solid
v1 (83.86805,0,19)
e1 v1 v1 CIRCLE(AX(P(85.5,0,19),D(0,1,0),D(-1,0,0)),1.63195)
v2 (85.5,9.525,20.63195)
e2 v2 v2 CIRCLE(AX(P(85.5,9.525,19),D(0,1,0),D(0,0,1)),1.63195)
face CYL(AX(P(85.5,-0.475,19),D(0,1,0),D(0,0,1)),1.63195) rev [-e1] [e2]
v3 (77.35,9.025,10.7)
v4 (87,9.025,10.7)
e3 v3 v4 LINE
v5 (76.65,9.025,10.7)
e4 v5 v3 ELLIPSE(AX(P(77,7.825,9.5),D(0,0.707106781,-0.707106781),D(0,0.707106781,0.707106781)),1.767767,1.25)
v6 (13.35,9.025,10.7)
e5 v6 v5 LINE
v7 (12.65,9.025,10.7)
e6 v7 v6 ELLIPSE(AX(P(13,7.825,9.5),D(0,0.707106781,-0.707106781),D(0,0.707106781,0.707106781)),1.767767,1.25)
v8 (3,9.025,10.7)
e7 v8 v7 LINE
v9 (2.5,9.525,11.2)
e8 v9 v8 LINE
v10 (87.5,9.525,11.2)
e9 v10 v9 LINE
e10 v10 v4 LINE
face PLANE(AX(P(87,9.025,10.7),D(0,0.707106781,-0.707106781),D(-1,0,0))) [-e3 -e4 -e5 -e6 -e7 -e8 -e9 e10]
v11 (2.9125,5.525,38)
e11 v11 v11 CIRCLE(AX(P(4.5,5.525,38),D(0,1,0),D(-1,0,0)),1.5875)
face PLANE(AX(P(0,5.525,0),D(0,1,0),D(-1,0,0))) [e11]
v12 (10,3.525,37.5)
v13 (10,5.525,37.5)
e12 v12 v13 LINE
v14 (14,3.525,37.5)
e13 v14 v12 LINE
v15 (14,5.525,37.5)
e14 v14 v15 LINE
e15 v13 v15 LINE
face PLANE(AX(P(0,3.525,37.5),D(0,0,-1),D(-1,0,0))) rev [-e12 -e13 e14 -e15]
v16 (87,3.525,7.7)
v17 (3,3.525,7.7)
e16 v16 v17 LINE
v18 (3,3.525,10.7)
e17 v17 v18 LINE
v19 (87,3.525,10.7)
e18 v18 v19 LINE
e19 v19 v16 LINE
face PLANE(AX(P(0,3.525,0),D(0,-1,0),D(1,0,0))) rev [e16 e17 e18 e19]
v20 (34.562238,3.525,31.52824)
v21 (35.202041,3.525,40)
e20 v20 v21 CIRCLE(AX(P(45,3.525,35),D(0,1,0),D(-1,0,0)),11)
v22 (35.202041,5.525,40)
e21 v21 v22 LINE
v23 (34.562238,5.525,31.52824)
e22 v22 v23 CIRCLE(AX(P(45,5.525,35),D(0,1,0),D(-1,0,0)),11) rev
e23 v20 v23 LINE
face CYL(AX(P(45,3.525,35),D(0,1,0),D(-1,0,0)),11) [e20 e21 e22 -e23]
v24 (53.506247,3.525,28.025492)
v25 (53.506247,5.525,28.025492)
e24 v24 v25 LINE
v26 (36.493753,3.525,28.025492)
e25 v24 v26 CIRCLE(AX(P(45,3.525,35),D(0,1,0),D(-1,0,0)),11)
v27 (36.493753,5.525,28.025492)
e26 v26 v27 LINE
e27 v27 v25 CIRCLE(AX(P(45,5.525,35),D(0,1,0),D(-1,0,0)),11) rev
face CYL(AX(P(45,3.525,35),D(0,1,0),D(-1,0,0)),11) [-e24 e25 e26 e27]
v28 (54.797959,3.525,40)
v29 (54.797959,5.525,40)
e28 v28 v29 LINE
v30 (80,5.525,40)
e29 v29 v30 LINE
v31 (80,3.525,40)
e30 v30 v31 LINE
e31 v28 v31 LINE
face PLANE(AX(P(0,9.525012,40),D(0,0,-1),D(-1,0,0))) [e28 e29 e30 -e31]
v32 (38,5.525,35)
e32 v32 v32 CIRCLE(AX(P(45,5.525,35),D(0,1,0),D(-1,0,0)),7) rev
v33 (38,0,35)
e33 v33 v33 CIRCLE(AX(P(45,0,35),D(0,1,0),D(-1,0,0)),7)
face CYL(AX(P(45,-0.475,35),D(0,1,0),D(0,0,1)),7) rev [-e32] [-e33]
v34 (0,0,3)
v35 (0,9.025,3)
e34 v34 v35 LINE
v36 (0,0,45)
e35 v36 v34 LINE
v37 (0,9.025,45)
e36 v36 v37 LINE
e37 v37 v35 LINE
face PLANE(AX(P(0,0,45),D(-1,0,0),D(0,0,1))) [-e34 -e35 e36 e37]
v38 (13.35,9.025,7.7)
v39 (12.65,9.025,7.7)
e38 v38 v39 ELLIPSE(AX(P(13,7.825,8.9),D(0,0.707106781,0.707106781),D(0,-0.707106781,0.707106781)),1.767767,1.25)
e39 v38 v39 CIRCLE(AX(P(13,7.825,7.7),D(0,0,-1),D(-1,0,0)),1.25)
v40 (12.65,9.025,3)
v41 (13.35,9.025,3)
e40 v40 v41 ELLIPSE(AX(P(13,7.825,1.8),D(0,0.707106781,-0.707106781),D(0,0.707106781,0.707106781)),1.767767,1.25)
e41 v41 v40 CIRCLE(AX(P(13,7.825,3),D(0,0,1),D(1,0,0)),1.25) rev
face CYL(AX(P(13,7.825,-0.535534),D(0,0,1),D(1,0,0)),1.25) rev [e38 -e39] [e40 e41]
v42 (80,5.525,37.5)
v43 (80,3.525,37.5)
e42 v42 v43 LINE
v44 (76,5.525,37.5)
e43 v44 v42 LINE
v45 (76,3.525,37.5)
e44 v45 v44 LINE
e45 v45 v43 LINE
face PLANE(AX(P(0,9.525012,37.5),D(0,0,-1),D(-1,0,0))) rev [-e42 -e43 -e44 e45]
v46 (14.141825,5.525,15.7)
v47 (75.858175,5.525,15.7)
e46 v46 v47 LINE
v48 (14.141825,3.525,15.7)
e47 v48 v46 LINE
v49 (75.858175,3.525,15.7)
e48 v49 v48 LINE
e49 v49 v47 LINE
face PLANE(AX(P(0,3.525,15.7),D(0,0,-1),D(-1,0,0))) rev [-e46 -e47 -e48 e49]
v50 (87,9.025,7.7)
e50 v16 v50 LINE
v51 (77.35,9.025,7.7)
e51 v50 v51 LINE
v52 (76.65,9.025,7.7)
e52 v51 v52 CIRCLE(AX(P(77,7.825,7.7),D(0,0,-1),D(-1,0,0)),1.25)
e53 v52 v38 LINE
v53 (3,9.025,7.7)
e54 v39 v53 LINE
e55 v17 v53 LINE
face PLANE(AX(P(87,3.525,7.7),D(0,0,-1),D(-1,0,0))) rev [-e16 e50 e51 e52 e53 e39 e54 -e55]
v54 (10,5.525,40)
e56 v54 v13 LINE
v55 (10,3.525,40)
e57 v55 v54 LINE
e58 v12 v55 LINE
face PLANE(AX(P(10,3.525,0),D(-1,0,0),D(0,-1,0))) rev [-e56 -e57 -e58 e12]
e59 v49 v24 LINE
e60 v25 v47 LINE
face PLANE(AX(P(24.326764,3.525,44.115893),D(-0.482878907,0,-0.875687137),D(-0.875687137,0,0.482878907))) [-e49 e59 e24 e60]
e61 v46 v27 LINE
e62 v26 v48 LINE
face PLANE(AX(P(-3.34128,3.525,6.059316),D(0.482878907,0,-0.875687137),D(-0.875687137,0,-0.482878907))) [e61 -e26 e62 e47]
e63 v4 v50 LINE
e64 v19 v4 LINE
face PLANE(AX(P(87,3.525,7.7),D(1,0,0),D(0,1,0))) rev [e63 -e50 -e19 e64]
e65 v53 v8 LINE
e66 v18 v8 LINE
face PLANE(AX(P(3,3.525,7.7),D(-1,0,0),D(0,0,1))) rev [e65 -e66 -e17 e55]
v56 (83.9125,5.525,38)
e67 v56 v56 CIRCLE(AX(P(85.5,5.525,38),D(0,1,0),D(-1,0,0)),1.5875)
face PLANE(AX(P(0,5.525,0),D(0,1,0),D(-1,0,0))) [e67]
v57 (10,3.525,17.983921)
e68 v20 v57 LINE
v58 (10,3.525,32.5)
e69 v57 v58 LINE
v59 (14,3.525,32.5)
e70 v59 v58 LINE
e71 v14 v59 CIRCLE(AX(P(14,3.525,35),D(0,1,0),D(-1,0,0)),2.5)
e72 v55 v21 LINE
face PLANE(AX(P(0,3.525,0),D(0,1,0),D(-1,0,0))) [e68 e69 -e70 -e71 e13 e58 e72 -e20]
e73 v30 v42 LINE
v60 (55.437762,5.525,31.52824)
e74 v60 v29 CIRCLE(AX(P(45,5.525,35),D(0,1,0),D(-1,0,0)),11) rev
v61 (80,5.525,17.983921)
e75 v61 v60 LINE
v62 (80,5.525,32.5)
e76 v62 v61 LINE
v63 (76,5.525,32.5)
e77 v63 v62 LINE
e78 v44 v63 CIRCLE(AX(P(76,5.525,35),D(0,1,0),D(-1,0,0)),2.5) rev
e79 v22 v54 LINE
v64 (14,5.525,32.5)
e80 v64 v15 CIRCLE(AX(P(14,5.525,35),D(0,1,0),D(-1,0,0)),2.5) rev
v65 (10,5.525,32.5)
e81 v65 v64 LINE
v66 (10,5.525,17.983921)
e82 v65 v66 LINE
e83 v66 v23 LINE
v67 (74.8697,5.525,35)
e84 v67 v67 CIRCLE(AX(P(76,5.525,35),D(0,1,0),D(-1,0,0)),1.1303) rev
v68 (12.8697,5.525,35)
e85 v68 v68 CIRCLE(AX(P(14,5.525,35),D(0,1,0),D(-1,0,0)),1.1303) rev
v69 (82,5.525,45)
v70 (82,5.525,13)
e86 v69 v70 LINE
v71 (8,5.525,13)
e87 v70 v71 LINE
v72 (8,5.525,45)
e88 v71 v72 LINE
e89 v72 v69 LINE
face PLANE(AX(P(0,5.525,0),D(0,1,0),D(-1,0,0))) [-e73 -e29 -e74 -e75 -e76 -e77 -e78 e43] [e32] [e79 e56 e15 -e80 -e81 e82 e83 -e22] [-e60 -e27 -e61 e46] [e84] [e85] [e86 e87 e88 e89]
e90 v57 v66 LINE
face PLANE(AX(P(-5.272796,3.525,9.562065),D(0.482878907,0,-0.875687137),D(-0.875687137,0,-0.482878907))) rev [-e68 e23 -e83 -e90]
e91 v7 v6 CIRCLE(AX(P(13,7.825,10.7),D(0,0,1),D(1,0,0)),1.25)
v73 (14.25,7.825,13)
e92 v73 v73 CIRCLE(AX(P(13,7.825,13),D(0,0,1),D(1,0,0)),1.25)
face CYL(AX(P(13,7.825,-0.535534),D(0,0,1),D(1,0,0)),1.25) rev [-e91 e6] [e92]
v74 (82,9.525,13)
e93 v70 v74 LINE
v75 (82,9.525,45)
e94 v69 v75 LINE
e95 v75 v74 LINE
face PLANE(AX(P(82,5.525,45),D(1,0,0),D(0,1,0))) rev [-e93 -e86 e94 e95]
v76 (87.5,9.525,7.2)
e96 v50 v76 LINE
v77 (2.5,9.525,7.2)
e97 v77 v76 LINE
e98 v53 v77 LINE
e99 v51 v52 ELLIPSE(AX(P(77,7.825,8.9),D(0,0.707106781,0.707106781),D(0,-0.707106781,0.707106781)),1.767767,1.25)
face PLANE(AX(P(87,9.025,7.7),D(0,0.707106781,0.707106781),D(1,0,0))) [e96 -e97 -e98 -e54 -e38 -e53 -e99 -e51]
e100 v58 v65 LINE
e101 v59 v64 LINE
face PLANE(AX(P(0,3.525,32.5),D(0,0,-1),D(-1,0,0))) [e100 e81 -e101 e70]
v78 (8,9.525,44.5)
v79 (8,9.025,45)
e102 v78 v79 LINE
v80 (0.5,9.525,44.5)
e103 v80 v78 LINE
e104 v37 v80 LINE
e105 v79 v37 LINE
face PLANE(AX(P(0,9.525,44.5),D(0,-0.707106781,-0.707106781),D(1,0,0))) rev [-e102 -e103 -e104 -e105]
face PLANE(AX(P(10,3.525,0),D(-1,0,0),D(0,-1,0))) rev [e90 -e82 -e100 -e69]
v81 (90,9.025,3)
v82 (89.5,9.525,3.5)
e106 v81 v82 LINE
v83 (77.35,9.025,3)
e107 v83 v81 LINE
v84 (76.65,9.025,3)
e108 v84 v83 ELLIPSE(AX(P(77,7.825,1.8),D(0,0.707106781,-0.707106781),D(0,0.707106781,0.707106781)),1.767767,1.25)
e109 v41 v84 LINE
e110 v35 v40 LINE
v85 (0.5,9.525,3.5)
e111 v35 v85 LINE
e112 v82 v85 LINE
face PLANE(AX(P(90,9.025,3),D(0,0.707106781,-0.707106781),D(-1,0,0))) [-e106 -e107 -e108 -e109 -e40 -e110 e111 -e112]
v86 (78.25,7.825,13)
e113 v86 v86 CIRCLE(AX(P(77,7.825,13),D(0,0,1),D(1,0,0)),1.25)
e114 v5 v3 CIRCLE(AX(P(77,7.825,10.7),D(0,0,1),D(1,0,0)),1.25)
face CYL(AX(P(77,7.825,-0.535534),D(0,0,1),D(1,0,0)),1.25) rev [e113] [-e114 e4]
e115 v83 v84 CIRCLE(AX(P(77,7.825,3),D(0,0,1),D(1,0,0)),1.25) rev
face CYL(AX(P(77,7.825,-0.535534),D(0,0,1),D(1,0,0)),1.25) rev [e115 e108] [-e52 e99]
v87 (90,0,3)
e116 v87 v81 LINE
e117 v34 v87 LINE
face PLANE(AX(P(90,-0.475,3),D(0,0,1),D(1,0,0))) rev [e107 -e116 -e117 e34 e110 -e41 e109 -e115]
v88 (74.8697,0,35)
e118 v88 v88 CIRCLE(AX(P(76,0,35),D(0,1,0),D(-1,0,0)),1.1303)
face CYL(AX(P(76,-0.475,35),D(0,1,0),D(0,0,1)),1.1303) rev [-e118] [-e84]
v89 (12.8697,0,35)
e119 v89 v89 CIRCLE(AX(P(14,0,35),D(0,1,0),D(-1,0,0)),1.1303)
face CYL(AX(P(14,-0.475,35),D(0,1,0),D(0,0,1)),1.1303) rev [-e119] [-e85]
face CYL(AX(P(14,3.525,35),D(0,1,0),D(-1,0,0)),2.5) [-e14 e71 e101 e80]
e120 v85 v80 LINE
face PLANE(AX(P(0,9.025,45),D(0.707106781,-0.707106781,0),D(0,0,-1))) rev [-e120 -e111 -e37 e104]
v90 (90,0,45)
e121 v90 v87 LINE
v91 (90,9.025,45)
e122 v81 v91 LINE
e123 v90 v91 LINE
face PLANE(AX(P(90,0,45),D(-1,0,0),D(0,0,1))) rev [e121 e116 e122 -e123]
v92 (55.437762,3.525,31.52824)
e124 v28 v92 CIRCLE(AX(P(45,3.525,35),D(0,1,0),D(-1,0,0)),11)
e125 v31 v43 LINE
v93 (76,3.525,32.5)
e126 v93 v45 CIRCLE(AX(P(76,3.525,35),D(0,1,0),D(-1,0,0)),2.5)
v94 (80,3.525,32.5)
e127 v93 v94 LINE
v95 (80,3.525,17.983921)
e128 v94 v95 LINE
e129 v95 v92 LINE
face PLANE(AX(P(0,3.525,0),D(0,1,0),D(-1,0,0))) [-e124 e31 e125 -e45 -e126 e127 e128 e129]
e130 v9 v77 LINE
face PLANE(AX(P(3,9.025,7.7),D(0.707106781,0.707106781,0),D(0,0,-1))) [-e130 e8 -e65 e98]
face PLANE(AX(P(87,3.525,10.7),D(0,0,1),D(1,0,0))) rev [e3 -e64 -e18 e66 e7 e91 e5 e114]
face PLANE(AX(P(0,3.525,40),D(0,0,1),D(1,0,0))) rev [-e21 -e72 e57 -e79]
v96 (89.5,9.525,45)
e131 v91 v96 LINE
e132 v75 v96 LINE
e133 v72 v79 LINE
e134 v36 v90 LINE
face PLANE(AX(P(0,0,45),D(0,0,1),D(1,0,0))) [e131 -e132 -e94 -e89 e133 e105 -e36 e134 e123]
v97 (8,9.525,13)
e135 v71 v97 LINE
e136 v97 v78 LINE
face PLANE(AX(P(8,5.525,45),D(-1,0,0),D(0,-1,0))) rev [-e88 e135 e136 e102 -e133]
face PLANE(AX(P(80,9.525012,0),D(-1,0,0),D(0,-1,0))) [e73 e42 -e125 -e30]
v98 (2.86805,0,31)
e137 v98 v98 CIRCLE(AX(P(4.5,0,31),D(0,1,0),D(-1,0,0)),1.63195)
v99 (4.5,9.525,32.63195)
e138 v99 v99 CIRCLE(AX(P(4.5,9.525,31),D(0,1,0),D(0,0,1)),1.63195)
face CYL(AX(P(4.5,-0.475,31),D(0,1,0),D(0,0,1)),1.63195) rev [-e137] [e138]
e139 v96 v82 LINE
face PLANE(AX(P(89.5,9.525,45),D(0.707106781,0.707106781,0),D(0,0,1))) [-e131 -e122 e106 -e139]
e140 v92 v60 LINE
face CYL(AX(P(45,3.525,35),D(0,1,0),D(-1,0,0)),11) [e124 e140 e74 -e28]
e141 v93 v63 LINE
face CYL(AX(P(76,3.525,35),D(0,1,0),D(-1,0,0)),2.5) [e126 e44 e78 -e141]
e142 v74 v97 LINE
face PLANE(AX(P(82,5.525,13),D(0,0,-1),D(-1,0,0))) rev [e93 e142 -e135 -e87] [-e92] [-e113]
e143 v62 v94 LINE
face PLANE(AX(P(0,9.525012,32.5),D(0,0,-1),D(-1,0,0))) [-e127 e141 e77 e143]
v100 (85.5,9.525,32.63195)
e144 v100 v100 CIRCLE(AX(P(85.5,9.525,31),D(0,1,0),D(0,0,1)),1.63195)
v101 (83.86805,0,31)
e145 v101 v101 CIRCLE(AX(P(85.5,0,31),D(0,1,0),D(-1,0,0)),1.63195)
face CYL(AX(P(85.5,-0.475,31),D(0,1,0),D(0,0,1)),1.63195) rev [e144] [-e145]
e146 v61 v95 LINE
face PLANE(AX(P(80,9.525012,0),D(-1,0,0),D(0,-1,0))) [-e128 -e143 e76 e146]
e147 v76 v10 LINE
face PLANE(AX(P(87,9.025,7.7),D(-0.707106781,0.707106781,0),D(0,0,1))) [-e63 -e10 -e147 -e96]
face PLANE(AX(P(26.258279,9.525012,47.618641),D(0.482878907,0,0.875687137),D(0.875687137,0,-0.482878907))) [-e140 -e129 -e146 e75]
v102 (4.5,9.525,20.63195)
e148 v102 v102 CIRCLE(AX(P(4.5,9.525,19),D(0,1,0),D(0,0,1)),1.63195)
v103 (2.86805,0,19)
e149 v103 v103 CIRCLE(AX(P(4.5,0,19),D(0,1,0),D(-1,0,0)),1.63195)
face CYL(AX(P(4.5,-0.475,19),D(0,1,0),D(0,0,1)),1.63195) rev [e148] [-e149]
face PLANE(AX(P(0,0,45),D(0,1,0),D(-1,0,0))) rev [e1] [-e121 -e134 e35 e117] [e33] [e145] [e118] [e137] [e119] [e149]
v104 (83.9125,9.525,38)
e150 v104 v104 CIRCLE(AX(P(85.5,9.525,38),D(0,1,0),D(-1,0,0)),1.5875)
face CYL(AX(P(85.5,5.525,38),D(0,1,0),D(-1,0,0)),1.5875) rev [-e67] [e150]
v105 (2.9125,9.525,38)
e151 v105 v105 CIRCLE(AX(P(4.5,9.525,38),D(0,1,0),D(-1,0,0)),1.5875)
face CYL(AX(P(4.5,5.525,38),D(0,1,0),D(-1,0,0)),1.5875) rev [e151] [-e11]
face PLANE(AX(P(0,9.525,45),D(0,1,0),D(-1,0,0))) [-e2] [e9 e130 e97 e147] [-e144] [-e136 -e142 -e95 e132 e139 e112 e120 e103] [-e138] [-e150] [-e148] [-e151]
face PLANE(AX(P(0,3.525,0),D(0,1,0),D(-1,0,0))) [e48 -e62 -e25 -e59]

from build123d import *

# Parameters (mm, degrees)
SKETCH1_W               = 90
SKETCH1_H               = 9.525
SKETCH1_R               = 2
BOSS_EXTRUDE1_DEPTH     = 45
SKETCH2_R               = 7
CUT_EXTRUDE2_DEPTH      = 10
SKETCH3_R               = 1.63195
SKETCH3_R_2             = 7
SKETCH3_R_3             = 1.1303
CUT_EXTRUDE3_DEPTH      = 10
SKETCH4_W               = 84
SKETCH4_H               = 3
CUT_EXTRUDE4_DEPTH      = 6
CUT_EXTRUDE6_DEPTH      = 102.072872844
CUT_EXTRUDE6_DEPTH_BACK = 6
SKETCH7_W               = 90
SKETCH7_H               = 3
CUT_EXTRUDE7_DEPTH      = 10
SKETCH9_W               = 74
SKETCH9_H               = 32
CUT_EXTRUDE8_DEPTH      = 4
CUT_EXTRUDE9_REACH      = 97.993
SKETCH10_R              = 1.25
CHAMFER2_SIZE           = 0.5
SKETCH11_R              = 1.5875
CUT_EXTRUDE10_DEPTH     = 4


with BuildPart() as part:
    # Sketch1 → Boss-Extrude1 (new body)
    # profile 1 of 3: a face of its own
    with BuildSketch(Plane.XY):
        with Locations((45, 4.7625)):
            Rectangle(SKETCH1_W, SKETCH1_H)
        with Locations((60, 4.7625)):
            Circle(SKETCH1_R, mode=Mode.SUBTRACT)
        with Locations((30, 4.7625)):
            Circle(SKETCH1_R, mode=Mode.SUBTRACT)
    # profile 2 of 3: a face of its own
    with BuildSketch(Plane.XY):
        with Locations((30, 4.7625)):
            Circle(SKETCH1_R)
    # profile 3 of 3: a face of its own
    with BuildSketch(Plane.XY):
        with Locations((60, 4.7625)):
            Circle(SKETCH1_R)
    extrude(amount=BOSS_EXTRUDE1_DEPTH)

    # Sketch2 → Cut-Extrude2 (cut)
    with BuildSketch(Plane(origin=(0, 9.525, 0), x_dir=(1, 0, 0), z_dir=(0, 1, 0))):
        with Locations(Location((45, -35, 0), (0, 0, 270))):
            Circle(SKETCH2_R)
    extrude(amount=-CUT_EXTRUDE2_DEPTH, mode=Mode.SUBTRACT)

    # Sketch3 → Cut-Extrude3 (cut)
    with BuildSketch(Plane(origin=(0, 9.525, 0), x_dir=(1, 0, 0), z_dir=(0, 1, 0))):
        with Locations(Location((85.5, -31, 0), (0, 0, 270))):
            Circle(SKETCH3_R)
        with Locations(Location((4.5, -31, 0), (0, 0, 270))):
            Circle(SKETCH3_R)
        with Locations(Location((45, -35, 0), (0, 0, 270))):
            Circle(SKETCH3_R_2)
        with Locations(Location((85.5, -19, 0), (0, 0, 270))):
            Circle(SKETCH3_R)
        with Locations(Location((4.5, -19, 0), (0, 0, 270))):
            Circle(SKETCH3_R)
        with Locations(Location((76, -35, 0), (0, 0, 270))):
            Circle(SKETCH3_R_3)
        with Locations(Location((14, -35, 0), (0, 0, 270))):
            Circle(SKETCH3_R_3)
    extrude(amount=-CUT_EXTRUDE3_DEPTH, mode=Mode.SUBTRACT)

    # Sketch4 → Cut-Extrude4 (cut)
    with BuildSketch(Plane(origin=(0, 9.525, 0), x_dir=(1, 0, 0), z_dir=(0, 1, 0))):
        with Locations((45, -9.2)):
            Rectangle(SKETCH4_W, SKETCH4_H)
    extrude(amount=-CUT_EXTRUDE4_DEPTH, mode=Mode.SUBTRACT)

    # Sketch6 → Cut-Extrude6 (cut, two sides: drawn at the far end of the back side and taken through both)
    with BuildSketch(Plane(origin=(0, 9.525, 0), x_dir=(1, 0, 0), z_dir=(0, 1, 0)).offset(-CUT_EXTRUDE6_DEPTH_BACK)):
        with BuildLine():
            ThreePointArc((14, -32.5), (16.5, -35), (14, -37.5))
            Line((14, -37.5), (10, -37.5))
            Line((10, -37.5), (10, -40))
            Line((10, -40), (35.202041029, -40))
            ThreePointArc((35.202041029, -40), (34.031236019, -35.828381989), (34.562237569, -31.528240298))
            Line((34.562237569, -31.528240298), (10, -17.983920725))
            Line((10, -17.983920725), (10, -32.5))
            Line((10, -32.5), (14, -32.5))
        make_face()
        with BuildLine():
            Line((14.141825149, -15.7), (36.493753196, -28.025491752))
            ThreePointArc((36.493753196, -28.025491752), (45, -24), (53.506246804, -28.025491752))
            Line((53.506246804, -28.025491752), (75.858174851, -15.7))
            Line((75.858174851, -15.7), (14.141825149, -15.7))
        make_face()
        with BuildLine():
            ThreePointArc((55.437762431, -31.528240298), (55.968763981, -35.828381989), (54.797958971, -40))
            Line((54.797958971, -40), (80, -40))
            Line((80, -40), (80, -37.5))
            Line((80, -37.5), (76, -37.5))
            ThreePointArc((76, -37.5), (73.5, -35), (76, -32.5))
            Line((76, -32.5), (80, -32.5))
            Line((80, -32.5), (80, -17.983920725))
            Line((80, -17.983920725), (55.437762431, -31.528240298))
        make_face()
    extrude(amount=CUT_EXTRUDE6_DEPTH + CUT_EXTRUDE6_DEPTH_BACK, mode=Mode.SUBTRACT)

    # Sketch7 → Cut-Extrude7 (cut)
    with BuildSketch(Plane(origin=(0, 9.525, 0), x_dir=(1, 0, 0), z_dir=(0, 1, 0))):
        with Locations((45, -1.5)):
            Rectangle(SKETCH7_W, SKETCH7_H)
    extrude(amount=-CUT_EXTRUDE7_DEPTH, mode=Mode.SUBTRACT)

    # Sketch9 → Cut-Extrude8 (cut)
    with BuildSketch(Plane(origin=(0, 9.525, 0), x_dir=(1, 0, 0), z_dir=(0, 1, 0))):
        with Locations((45, -29)):
            Rectangle(SKETCH9_W, SKETCH9_H)
    extrude(amount=-CUT_EXTRUDE8_DEPTH, mode=Mode.SUBTRACT)

    # Cut-Extrude9: up to this face of the body (flat: up to its plane)
    cut_extrude9_end = Plane(part.part.faces().sort_by_distance((45, 4.7625, 3))[0])
    # Sketch10 → Cut-Extrude9 (cut, up to the picked face)
    with BuildSketch(Plane.XY.offset(13), mode=Mode.PRIVATE) as cut_extrude9_sk1:
        with Locations((77, 7.825)):
            Circle(SKETCH10_R)
    cut_extrude9_tool1 = split(extrude(cut_extrude9_sk1.sketch, amount=-CUT_EXTRUDE9_REACH, mode=Mode.PRIVATE), bisect_by=cut_extrude9_end, keep=Keep.BOTH, mode=Mode.PRIVATE)
    # Sketch10 → Cut-Extrude9 (cut, up to the picked face)
    with BuildSketch(Plane.XY.offset(13), mode=Mode.PRIVATE) as cut_extrude9_sk2:
        with Locations((13, 7.825)):
            Circle(SKETCH10_R)
    cut_extrude9_tool2 = split(extrude(cut_extrude9_sk2.sketch, amount=-CUT_EXTRUDE9_REACH, mode=Mode.PRIVATE), bisect_by=cut_extrude9_end, keep=Keep.BOTH, mode=Mode.PRIVATE)
    add(cut_extrude9_tool1.solids().sort_by(Axis((77, 7.825, 13), (0, 0, -1)))[0], mode=Mode.SUBTRACT)
    add(cut_extrude9_tool2.solids().sort_by(Axis((13, 7.825, 13), (0, 0, -1)))[0], mode=Mode.SUBTRACT)

    # Chamfer2
    # the kernel refuses this chamfer: 0.5 mm, written as the material it takes off along each edge
    with BuildSketch(Plane(origin=(9.285841494, 9.525, 45), x_dir=(0, -0.999621916911297, 0.0274958766105822), z_dir=(-1, 0, 0))) as chamfer2_piece_1:
        Polygon((CHAMFER2_SIZE * 0.999621916911, -CHAMFER2_SIZE * 0.0274958766106), (-CHAMFER2_SIZE * 0.0274958766106, -CHAMFER2_SIZE * 0.999621916911), (0, 0), align=None)
    extrude(amount=10.571682988, mode=Mode.SUBTRACT)
    with BuildSketch(Plane(origin=(-1.285841494, 9.525, 3), x_dir=(0, -0.9996219169112968, -0.02749587661058651), z_dir=(1, 0, 0))) as chamfer2_piece_2:
        Polygon((CHAMFER2_SIZE * 0.999621916911, -CHAMFER2_SIZE * 0.0274958766106), (-CHAMFER2_SIZE * 0.0274958766106, -CHAMFER2_SIZE * 0.999621916911), (0, 0), align=None)
    extrude(amount=92.571682988, mode=Mode.SUBTRACT)
    with BuildSketch(Plane(origin=(87, 9.525, 10.7), x_dir=(0.999621916911297, 0.027495876610582292, 0), z_dir=(0, 0, -1)), Plane(origin=(3, 9.525, 7.7), x_dir=(-0.9996219169112968, 0.027495876610585408, -1.1837901526131803e-15), z_dir=(0, 0, 1))) as chamfer2_piece_3:
        Polygon((CHAMFER2_SIZE * 0.999621916911, CHAMFER2_SIZE * 0.0274958766106), (-CHAMFER2_SIZE * 0.0274958766106, CHAMFER2_SIZE * 0.999621916911), (0, 0), align=None)
    extrude(amount=3, mode=Mode.SUBTRACT)
    with BuildSketch(Plane(origin=(87, 9.525, 7.7), x_dir=(0, 0.0274958766105822, -0.999621916911297), z_dir=(-1, 0, 0)), Plane(origin=(3, 9.525, 10.7), x_dir=(0, 0.027495876610585647, 0.9996219169112968), z_dir=(1, 0, 0))) as chamfer2_piece_4:
        Polygon((CHAMFER2_SIZE * 0.999621916911, CHAMFER2_SIZE * 0.0274958766106), (-CHAMFER2_SIZE * 0.0274958766106, CHAMFER2_SIZE * 0.999621916911), (0, 0), align=None)
    extrude(amount=84, mode=Mode.SUBTRACT)
    with BuildSketch(Plane(origin=(0, 9.525, 1.714158506), x_dir=(-0.02749587661058639, -0.9996219169112968, 0), z_dir=(0, 0, 1))) as chamfer2_piece_5:
        Polygon((CHAMFER2_SIZE * 0.999621916911, CHAMFER2_SIZE * 0.0274958766106), (-CHAMFER2_SIZE * 0.0274958766106, CHAMFER2_SIZE * 0.999621916911), (0, 0), align=None)
    extrude(amount=44.571682988, mode=Mode.SUBTRACT)
    with BuildSketch(Plane(origin=(90, 9.525, 1.714158506), x_dir=(0.0274958766105822, -0.999621916911297, 0), z_dir=(0, 0, 1))) as chamfer2_piece_6:
        Polygon((CHAMFER2_SIZE * 0.999621916911, -CHAMFER2_SIZE * 0.0274958766106), (-CHAMFER2_SIZE * 0.0274958766106, -CHAMFER2_SIZE * 0.999621916911), (0, 0), align=None)
    extrude(amount=44.571682988, mode=Mode.SUBTRACT)
    with BuildSketch(Plane(origin=(87, 9.525, 11.985841494), x_dir=(0.9996219169112968, 0.02749587661058574, 0), z_dir=(0, 0, -1))) as chamfer2_piece_7a_section:
        Polygon((CHAMFER2_SIZE * 0.999621916911, CHAMFER2_SIZE * 0.0274958766106), (-CHAMFER2_SIZE * 0.0274958766106, CHAMFER2_SIZE * 0.999621916911), (0, 0), align=None)
    chamfer2_piece_7a = extrude(amount=4.285841494, mode=Mode.PRIVATE)
    chamfer2_piece_7a = split(chamfer2_piece_7a, bisect_by=Plane(origin=(87.164896813, 9.360103187, 10.7), z_dir=(0, 0, 1)), keep=Keep.TOP, mode=Mode.PRIVATE)
    with BuildSketch(Plane(origin=(3, 9.525, 10.7), x_dir=(0, 0.027495876610585647, 0.9996219169112968), z_dir=(1, 0, 0))) as chamfer2_piece_7b_section:
        Polygon((CHAMFER2_SIZE * 0.999621916911, CHAMFER2_SIZE * 0.0274958766106), (-CHAMFER2_SIZE * 0.0274958766106, CHAMFER2_SIZE * 0.999621916911), (0, 0), align=None)
    chamfer2_piece_7b = extrude(amount=85.285841494, mode=Mode.PRIVATE)
    chamfer2_piece_7b = split(chamfer2_piece_7b, bisect_by=Plane(origin=(87, 9.360103187, 10.864896813), z_dir=(1, 0, 0)), keep=Keep.TOP, mode=Mode.PRIVATE)
    chamfer2_piece_7 = chamfer2_piece_7a & chamfer2_piece_7b
    add(chamfer2_piece_7, mode=Mode.SUBTRACT)
    with BuildSketch(Plane(origin=(87, 9.525, 10.7), x_dir=(0.999621916911297, 0.027495876610582292, 0), z_dir=(0, 0, -1))) as chamfer2_piece_8a_section:
        Polygon((CHAMFER2_SIZE * 0.999621916911, CHAMFER2_SIZE * 0.0274958766106), (-CHAMFER2_SIZE * 0.0274958766106, CHAMFER2_SIZE * 0.999621916911), (0, 0), align=None)
    chamfer2_piece_8a = extrude(amount=4.285841494, mode=Mode.PRIVATE)
    chamfer2_piece_8a = split(chamfer2_piece_8a, bisect_by=Plane(origin=(87.164896813, 9.360103187, 7.7), z_dir=(0, 0, -1)), keep=Keep.TOP, mode=Mode.PRIVATE)
    with BuildSketch(Plane(origin=(88.285841494, 9.525, 7.7), x_dir=(0, 0.027495876610585647, -0.9996219169112968), z_dir=(-1, 0, 0))) as chamfer2_piece_8b_section:
        Polygon((CHAMFER2_SIZE * 0.999621916911, CHAMFER2_SIZE * 0.0274958766106), (-CHAMFER2_SIZE * 0.0274958766106, CHAMFER2_SIZE * 0.999621916911), (0, 0), align=None)
    chamfer2_piece_8b = extrude(amount=85.285841494, mode=Mode.PRIVATE)
    chamfer2_piece_8b = split(chamfer2_piece_8b, bisect_by=Plane(origin=(87, 9.360103187, 7.535103187), z_dir=(1, 0, 0)), keep=Keep.TOP, mode=Mode.PRIVATE)
    chamfer2_piece_8 = chamfer2_piece_8a & chamfer2_piece_8b
    add(chamfer2_piece_8, mode=Mode.SUBTRACT)
    with BuildSketch(Plane(origin=(87, 9.525, 7.7), x_dir=(0, 0.0274958766105822, -0.999621916911297), z_dir=(-1, 0, 0))) as chamfer2_piece_9a_section:
        Polygon((CHAMFER2_SIZE * 0.999621916911, CHAMFER2_SIZE * 0.0274958766106), (-CHAMFER2_SIZE * 0.0274958766106, CHAMFER2_SIZE * 0.999621916911), (0, 0), align=None)
    chamfer2_piece_9a = extrude(amount=85.285841494, mode=Mode.PRIVATE)
    chamfer2_piece_9a = split(chamfer2_piece_9a, bisect_by=Plane(origin=(3, 9.360103187, 7.535103187), z_dir=(-1, 0, 0)), keep=Keep.TOP, mode=Mode.PRIVATE)
    with BuildSketch(Plane(origin=(3, 9.525, 6.414158506), x_dir=(-0.9996219169112968, 0.027495876610585623, -1.1837901526131803e-15), z_dir=(0, 0, 1))) as chamfer2_piece_9b_section:
        Polygon((CHAMFER2_SIZE * 0.999621916911, CHAMFER2_SIZE * 0.0274958766106), (-CHAMFER2_SIZE * 0.0274958766106, CHAMFER2_SIZE * 0.999621916911), (0, 0), align=None)
    chamfer2_piece_9b = extrude(amount=4.285841494, mode=Mode.PRIVATE)
    chamfer2_piece_9b = split(chamfer2_piece_9b, bisect_by=Plane(origin=(2.835103187, 9.360103187, 7.7), z_dir=(0, 0, -1)), keep=Keep.TOP, mode=Mode.PRIVATE)
    chamfer2_piece_9 = chamfer2_piece_9a & chamfer2_piece_9b
    add(chamfer2_piece_9, mode=Mode.SUBTRACT)
    with BuildSketch(Plane(origin=(1.714158506, 9.525, 10.7), x_dir=(0, 0.027495876610585647, 0.9996219169112968), z_dir=(1, 0, 0))) as chamfer2_piece_10a_section:
        Polygon((CHAMFER2_SIZE * 0.999621916911, CHAMFER2_SIZE * 0.0274958766106), (-CHAMFER2_SIZE * 0.0274958766106, CHAMFER2_SIZE * 0.999621916911), (0, 0), align=None)
    chamfer2_piece_10a = extrude(amount=85.285841494, mode=Mode.PRIVATE)
    chamfer2_piece_10a = split(chamfer2_piece_10a, bisect_by=Plane(origin=(3, 9.360103187, 10.864896813), z_dir=(-1, 0, 0)), keep=Keep.TOP, mode=Mode.PRIVATE)
    with BuildSketch(Plane(origin=(3, 9.525, 7.7), x_dir=(-0.9996219169112968, 0.027495876610585408, -1.1837901526131803e-15), z_dir=(0, 0, 1))) as chamfer2_piece_10b_section:
        Polygon((CHAMFER2_SIZE * 0.999621916911, CHAMFER2_SIZE * 0.0274958766106), (-CHAMFER2_SIZE * 0.0274958766106, CHAMFER2_SIZE * 0.999621916911), (0, 0), align=None)
    chamfer2_piece_10b = extrude(amount=4.285841494, mode=Mode.PRIVATE)
    chamfer2_piece_10b = split(chamfer2_piece_10b, bisect_by=Plane(origin=(2.835103187, 9.360103187, 10.7), z_dir=(0, 0, 1)), keep=Keep.TOP, mode=Mode.PRIVATE)
    chamfer2_piece_10 = chamfer2_piece_10a & chamfer2_piece_10b
    add(chamfer2_piece_10, mode=Mode.SUBTRACT)

    # Sketch11 → Cut-Extrude10 (cut)
    with BuildSketch(Plane(origin=(0, 9.525, 0), x_dir=(1, 0, 0), z_dir=(0, 1, 0))):
        with Locations(Location((85.5, -38, 0), (0, 0, 180))):
            Circle(SKETCH11_R)
        with Locations(Location((4.5, -38, 0), (0, 0, 180))):
            Circle(SKETCH11_R)
    extrude(amount=-CUT_EXTRUDE10_DEPTH, mode=Mode.SUBTRACT)


solid = part.part
